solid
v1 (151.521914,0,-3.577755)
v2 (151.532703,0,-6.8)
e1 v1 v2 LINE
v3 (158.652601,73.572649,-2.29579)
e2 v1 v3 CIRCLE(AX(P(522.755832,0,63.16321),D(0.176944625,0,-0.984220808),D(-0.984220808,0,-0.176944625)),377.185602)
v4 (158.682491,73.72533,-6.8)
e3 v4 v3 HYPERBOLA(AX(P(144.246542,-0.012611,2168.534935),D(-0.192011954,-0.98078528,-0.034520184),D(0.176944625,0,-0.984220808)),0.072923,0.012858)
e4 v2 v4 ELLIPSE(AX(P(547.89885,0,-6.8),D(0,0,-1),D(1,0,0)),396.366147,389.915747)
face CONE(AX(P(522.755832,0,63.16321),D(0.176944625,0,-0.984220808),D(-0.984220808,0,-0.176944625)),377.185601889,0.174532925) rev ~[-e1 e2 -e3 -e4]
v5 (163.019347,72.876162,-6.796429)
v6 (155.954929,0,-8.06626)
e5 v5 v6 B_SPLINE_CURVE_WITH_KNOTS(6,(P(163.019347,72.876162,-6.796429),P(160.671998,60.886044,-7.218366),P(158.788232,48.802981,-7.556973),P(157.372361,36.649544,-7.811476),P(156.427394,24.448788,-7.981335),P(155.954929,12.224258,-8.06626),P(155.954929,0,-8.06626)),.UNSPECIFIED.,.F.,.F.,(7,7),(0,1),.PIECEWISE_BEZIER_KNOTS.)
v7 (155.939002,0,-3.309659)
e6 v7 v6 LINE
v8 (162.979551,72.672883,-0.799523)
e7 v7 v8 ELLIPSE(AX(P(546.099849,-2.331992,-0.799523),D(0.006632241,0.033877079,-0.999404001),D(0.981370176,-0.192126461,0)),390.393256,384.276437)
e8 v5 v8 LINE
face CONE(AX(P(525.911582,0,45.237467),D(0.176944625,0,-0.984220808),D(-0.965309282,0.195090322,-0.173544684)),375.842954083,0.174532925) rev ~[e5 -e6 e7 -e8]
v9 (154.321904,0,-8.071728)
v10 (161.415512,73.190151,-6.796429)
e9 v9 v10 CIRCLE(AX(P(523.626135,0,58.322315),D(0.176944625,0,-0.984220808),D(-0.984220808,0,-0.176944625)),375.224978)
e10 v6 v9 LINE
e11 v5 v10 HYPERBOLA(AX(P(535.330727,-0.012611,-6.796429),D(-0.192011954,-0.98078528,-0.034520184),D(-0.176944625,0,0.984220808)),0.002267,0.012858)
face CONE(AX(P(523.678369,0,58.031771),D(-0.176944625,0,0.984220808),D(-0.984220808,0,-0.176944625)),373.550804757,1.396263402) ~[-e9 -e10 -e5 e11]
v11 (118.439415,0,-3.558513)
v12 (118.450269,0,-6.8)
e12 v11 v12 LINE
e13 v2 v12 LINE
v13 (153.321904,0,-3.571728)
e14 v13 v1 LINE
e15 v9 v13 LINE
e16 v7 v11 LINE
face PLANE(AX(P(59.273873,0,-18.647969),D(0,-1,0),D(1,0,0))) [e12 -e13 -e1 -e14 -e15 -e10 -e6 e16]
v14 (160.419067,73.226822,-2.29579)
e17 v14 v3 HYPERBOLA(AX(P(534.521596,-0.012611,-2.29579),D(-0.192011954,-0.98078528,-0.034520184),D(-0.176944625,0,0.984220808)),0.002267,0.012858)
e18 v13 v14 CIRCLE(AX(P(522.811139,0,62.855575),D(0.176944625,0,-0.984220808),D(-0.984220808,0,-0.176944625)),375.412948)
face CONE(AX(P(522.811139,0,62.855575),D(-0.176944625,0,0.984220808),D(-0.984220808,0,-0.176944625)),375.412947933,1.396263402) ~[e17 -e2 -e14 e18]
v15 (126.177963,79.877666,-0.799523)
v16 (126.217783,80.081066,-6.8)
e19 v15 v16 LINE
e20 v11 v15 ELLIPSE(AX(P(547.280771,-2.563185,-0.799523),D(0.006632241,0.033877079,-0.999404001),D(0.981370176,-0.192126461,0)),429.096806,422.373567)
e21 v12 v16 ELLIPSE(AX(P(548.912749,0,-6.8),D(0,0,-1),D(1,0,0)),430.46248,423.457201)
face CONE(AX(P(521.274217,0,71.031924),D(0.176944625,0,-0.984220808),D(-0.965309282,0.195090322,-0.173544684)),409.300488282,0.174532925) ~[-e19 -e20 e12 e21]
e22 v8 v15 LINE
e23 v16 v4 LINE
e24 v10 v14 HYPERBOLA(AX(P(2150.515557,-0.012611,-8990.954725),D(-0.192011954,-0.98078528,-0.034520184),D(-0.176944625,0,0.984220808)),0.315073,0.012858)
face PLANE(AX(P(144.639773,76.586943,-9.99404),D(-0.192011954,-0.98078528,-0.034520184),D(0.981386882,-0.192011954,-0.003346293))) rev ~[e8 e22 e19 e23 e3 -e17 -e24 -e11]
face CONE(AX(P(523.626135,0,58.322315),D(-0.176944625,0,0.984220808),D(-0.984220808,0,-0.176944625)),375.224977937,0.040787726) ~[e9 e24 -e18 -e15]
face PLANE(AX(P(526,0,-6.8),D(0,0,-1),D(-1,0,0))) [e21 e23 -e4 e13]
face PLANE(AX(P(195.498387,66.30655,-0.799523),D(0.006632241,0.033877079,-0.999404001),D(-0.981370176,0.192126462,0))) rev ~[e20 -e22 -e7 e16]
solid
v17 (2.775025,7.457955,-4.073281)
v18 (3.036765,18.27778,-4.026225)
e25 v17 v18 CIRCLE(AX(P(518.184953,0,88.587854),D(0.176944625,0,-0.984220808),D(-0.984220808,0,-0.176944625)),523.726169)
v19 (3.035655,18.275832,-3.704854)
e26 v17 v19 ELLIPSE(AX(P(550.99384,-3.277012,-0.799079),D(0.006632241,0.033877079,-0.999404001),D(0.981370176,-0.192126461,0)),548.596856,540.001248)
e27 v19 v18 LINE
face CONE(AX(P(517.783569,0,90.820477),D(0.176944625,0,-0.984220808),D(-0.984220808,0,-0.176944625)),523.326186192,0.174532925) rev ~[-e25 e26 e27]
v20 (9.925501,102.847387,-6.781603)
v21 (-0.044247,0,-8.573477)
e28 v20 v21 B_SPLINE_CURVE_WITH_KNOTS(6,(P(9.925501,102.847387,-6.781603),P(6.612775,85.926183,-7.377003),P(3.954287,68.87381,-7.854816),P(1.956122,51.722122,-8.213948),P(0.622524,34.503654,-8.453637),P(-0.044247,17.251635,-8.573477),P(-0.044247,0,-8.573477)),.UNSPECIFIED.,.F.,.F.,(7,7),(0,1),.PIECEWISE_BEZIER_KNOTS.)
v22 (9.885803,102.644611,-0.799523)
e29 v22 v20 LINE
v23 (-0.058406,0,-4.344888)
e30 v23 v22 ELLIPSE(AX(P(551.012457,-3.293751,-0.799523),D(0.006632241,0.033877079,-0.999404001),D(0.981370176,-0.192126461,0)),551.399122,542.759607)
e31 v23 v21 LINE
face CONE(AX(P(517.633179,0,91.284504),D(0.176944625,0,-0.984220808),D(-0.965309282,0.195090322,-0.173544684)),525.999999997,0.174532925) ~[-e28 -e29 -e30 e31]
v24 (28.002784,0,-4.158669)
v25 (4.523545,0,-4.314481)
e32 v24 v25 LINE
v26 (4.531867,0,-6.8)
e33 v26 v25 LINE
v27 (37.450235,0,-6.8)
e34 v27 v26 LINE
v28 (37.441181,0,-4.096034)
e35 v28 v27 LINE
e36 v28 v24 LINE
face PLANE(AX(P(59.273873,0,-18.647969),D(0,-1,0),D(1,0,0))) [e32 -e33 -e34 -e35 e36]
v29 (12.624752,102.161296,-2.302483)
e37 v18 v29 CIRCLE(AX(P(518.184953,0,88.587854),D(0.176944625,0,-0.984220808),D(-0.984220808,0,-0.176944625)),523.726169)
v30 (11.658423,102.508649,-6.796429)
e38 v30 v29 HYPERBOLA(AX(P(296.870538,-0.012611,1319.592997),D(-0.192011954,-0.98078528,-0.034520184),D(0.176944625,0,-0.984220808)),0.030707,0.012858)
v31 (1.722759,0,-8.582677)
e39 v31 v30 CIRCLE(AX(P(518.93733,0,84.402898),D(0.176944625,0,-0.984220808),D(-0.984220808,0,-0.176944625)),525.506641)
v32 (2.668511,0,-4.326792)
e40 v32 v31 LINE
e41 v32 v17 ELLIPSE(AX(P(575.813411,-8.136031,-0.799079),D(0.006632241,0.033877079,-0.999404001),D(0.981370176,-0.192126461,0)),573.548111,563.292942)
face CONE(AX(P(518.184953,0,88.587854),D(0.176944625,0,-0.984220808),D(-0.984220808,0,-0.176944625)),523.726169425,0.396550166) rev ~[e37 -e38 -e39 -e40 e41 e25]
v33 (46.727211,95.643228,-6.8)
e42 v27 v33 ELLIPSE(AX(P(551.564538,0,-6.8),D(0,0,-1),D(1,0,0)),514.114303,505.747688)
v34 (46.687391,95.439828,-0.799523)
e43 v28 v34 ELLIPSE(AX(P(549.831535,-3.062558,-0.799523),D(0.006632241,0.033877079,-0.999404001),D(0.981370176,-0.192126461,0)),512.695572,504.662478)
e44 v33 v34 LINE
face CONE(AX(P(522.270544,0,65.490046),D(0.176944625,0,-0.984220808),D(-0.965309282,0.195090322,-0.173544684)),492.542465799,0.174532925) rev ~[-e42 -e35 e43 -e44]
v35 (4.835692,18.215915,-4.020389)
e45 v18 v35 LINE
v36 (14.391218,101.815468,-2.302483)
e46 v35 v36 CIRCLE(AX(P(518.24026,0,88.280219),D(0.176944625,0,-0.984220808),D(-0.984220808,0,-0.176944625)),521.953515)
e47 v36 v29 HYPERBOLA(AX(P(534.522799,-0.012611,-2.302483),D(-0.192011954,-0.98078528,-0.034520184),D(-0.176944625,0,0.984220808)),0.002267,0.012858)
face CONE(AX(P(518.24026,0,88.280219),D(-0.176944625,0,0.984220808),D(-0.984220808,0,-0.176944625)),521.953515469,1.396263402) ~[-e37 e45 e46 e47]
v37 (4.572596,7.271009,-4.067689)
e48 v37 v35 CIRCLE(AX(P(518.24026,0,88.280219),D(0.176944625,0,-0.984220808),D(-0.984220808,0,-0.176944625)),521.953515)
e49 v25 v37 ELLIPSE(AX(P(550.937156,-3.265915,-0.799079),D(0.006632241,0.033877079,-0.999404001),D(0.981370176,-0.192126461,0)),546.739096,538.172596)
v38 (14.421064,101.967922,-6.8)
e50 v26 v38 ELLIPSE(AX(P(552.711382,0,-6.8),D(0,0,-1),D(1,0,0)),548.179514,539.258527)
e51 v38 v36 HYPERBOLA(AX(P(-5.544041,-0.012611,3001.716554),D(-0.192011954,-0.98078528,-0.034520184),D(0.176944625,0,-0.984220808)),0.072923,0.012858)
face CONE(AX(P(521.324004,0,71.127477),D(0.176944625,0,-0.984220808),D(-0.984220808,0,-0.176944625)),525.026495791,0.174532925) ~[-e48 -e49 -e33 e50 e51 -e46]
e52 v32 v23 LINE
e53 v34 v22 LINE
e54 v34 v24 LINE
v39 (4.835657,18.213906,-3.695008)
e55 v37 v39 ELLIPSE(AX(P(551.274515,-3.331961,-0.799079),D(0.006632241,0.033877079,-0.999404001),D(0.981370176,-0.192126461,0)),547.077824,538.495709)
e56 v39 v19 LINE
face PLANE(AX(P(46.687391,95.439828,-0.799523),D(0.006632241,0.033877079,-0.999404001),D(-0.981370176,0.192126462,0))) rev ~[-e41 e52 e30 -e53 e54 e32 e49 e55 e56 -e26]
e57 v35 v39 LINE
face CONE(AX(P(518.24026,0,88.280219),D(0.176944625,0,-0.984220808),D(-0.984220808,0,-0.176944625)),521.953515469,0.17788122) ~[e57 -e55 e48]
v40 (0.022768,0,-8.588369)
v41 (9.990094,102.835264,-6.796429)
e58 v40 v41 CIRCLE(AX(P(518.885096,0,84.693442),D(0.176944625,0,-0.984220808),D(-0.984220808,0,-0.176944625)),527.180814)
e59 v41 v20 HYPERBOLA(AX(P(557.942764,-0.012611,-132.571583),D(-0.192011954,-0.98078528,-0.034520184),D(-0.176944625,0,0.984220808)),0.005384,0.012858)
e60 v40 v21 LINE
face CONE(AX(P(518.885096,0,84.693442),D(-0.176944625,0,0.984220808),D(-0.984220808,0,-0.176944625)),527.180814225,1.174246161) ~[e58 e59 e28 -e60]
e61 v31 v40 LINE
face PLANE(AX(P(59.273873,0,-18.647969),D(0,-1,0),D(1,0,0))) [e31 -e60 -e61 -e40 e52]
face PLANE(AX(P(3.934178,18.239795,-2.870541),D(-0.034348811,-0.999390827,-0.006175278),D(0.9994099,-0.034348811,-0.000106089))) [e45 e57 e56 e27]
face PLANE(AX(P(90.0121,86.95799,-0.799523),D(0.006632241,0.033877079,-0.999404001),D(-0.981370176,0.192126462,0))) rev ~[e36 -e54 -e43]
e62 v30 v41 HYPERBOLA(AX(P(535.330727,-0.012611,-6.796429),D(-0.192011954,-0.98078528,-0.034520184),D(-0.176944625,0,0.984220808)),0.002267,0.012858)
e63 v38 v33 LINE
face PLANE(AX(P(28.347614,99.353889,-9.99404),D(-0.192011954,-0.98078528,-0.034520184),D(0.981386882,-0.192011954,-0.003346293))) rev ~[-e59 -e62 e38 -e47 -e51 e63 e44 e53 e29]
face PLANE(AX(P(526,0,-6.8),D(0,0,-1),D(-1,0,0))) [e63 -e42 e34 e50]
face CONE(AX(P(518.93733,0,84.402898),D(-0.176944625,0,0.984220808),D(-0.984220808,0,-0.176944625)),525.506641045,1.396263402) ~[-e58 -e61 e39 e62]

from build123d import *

# Parameters (mm, degrees)
F1_ANGLE_BACK = 11.25
F1_ANGLE      = 22.5
F2_W          = 148
F2_H          = 20.6737495929
F5_DEPTH      = 211.4
F7_DEPTH      = 234.2
F8_W          = 286.8234440684
F8_H          = 99.4558036327
F9_DEPTH      = 112
F11_ANGLE     = 30
F13_ANGLE     = 2


# Not quite as in the source:
# - a feature names something its author has since deleted; it is built from what else it names


with BuildPart() as f1:
    # F0 (on Front) → F1 (revolve)
    with BuildSketch(Plane.XZ, mode=Mode.PRIVATE) as f1_sk:
        Polygon((37.433034228, -1.662807624), (-0.066965772, -1.7883691504), (0, -21.7882570398), (37.5, -21.6626955134), align=None)
    revolve(f1_sk.sketch.rotate(Axis((525.8388087714, 0, 45.6422517605), (-0.1769446249, 0, 0.9842208084)), -F1_ANGLE_BACK), axis=Axis((525.8388087714, 0, 45.6422517605), (-0.1769446249, 0, 0.9842208084)), revolution_arc=F1_ANGLE)


with BuildPart() as f1b:
    # F0 (on Front) → F1, piece 2 (revolve)
    with BuildSketch(Plane.XZ, mode=Mode.PRIVATE) as f1_sk:
        Polygon((155.9321597647, -1.2660361285), (118.4321597647, -1.391597655), (118.4991255367, -21.3914855443), (155.9991255367, -21.2659240179), align=None)
    revolve(f1_sk.sketch.rotate(Axis((525.8388087714, 0, 45.6422517605), (-0.1769446249, 0, 0.9842208084)), -F1_ANGLE_BACK), axis=Axis((525.8388087714, 0, 45.6422517605), (-0.1769446249, 0, 0.9842208084)), revolution_arc=F1_ANGLE)


with BuildPart() as f3_tool:
    # F2 (on Front) → F3 (revolve)
    with BuildSketch(Plane.XZ):
        with Locations((78, -17.1368747965)):
            Rectangle(F2_W, F2_H)
    revolve(axis=Axis((526, 0, -40.4653474689), (0, 0, -1)))


with BuildPart() as f1_1:
    add(f1.part)

    # F3: cut by f3_tool
    add(f3_tool.part, mode=Mode.SUBTRACT)

    # F6 (on face) → F7 (cut)
    with BuildSketch(Plane(origin=(19.6894657776, 100.5725829361, 3.539800323), x_dir=(-0.9813925868, 0.1918931334, 0.0067539617), z_dir=(0.1920119545, 0.9807852804, 0.0345201838))):
        Polygon((9.9895421705, -4.4095212135), (35.8401375413, -4.5842232545), (37.4985628908, 20.4695294659), (-71.4865817421, 21.206066746), (-71.6559666141, -3.8577491241), (-27.5098117032, -4.1560951874), (-27.5044053117, -3.3561134558), (9.9949485621, -3.6095394819), align=None)
        Polygon((-27.5098117032, -4.1560951874), (9.9895421705, -4.4095212135), (9.9949485621, -3.6095394819), (-27.5044053117, -3.3561134558), align=None)
    extrude(amount=-F7_DEPTH, mode=Mode.SUBTRACT)


with BuildPart() as f1b_1:
    add(f1b.part)

    # F3: cut by f3_tool
    add(f3_tool.part, mode=Mode.SUBTRACT)

    # F4 (on face) → F5 (cut)
    with BuildSketch(Plane(origin=(19.6894657776, 100.5725829361, 3.539800323), x_dir=(-0.9813925868, 0.1918931334, 0.0067539617), z_dir=(0.1920119545, 0.9807852804, 0.0345201838))):
        Polygon((-108.5075416222, -3.6087008807), (-101.6713570142, -3.6549007994), (-102.5302484632, 6.0979337431), (-179.1422963142, 8.3114448935), (-179.1422963142, -3.1313410508), (-146.006895496, -3.3552748546), (-146.0014891044, -2.555293123), (-108.5021352307, -2.8087191491), align=None)
        Polygon((-146.006895496, -3.3552748546), (-108.5075416222, -3.6087008807), (-108.5021352307, -2.8087191491), (-146.0014891044, -2.555293123), align=None)
    extrude(amount=-F5_DEPTH, mode=Mode.SUBTRACT)


with BuildPart() as f9_tool:
    # F8 (on Front) → F9 (new body)
    with BuildSketch(Plane.XZ):
        with Locations((59.2738725245, -18.6479687691)):
            Rectangle(F8_W, F8_H)
    extrude(amount=F9_DEPTH)


with BuildPart() as f1_2:
    add(f1_1.part)

    # F9: cut by f9_tool
    add(f9_tool.part, mode=Mode.SUBTRACT)


with BuildPart() as f1b_2:
    add(f1b_1.part)

    # F9: cut by f9_tool
    add(f9_tool.part, mode=Mode.SUBTRACT)


with BuildPart() as f11_tool:
    # F10 (on Front) → F11 (revolve)
    with BuildSketch(Plane.XZ):
        Polygon((1.7227589607, -8.5826770598), (0.0227684901, -8.5883691504), (0.066965772, -21.7882570398), (4.5820021559, -21.7731393102), (4.5227488708, -4.0766501403), (2.7227589607, -4.0826770598), align=None)
        Polygon((156.0660913087, -21.2659240179), (156.0218940268, -8.0660361285), (154.3219035562, -8.0717282192), (153.3219035562, -3.5717282192), (151.5219136462, -3.5777551387), (151.5811893534, -21.2809408481), align=None)
        Polygon((0.066965772, -21.7882570398), (0.0227684901, -8.5883691504), (-1.582706409, -8.2315969506), (-1.532864623, -23.1172631943), align=None)
    revolve(axis=Axis((525.9057745435, 0, 45.6422517605), (0.1769446249, 0, -0.9842208084)), revolution_arc=F11_ANGLE)


with BuildPart() as f1_3:
    add(f1_2.part)

    # F11: cut by f11_tool
    add(f11_tool.part, mode=Mode.SUBTRACT)

    # F12 (on Front) → F13 (revolve, cut)
    with BuildSketch(Plane.XZ):
        Polygon((4.5227488708, -4.0766501403), (4.5227488708, -1.773225597), (2.7150464738, -1.7792783403), (2.7227589607, -4.0826770598), align=None)
    revolve(axis=Axis((525.9057745435, 0, 45.6422517605), (0.1769446249, 0, -0.9842208084)), revolution_arc=F13_ANGLE, mode=Mode.SUBTRACT)


with BuildPart() as f1b_3:
    add(f1b_2.part)

    # F11: cut by f11_tool
    add(f11_tool.part, mode=Mode.SUBTRACT)


solid = Compound([f1_3.part, f1b_3.part])
